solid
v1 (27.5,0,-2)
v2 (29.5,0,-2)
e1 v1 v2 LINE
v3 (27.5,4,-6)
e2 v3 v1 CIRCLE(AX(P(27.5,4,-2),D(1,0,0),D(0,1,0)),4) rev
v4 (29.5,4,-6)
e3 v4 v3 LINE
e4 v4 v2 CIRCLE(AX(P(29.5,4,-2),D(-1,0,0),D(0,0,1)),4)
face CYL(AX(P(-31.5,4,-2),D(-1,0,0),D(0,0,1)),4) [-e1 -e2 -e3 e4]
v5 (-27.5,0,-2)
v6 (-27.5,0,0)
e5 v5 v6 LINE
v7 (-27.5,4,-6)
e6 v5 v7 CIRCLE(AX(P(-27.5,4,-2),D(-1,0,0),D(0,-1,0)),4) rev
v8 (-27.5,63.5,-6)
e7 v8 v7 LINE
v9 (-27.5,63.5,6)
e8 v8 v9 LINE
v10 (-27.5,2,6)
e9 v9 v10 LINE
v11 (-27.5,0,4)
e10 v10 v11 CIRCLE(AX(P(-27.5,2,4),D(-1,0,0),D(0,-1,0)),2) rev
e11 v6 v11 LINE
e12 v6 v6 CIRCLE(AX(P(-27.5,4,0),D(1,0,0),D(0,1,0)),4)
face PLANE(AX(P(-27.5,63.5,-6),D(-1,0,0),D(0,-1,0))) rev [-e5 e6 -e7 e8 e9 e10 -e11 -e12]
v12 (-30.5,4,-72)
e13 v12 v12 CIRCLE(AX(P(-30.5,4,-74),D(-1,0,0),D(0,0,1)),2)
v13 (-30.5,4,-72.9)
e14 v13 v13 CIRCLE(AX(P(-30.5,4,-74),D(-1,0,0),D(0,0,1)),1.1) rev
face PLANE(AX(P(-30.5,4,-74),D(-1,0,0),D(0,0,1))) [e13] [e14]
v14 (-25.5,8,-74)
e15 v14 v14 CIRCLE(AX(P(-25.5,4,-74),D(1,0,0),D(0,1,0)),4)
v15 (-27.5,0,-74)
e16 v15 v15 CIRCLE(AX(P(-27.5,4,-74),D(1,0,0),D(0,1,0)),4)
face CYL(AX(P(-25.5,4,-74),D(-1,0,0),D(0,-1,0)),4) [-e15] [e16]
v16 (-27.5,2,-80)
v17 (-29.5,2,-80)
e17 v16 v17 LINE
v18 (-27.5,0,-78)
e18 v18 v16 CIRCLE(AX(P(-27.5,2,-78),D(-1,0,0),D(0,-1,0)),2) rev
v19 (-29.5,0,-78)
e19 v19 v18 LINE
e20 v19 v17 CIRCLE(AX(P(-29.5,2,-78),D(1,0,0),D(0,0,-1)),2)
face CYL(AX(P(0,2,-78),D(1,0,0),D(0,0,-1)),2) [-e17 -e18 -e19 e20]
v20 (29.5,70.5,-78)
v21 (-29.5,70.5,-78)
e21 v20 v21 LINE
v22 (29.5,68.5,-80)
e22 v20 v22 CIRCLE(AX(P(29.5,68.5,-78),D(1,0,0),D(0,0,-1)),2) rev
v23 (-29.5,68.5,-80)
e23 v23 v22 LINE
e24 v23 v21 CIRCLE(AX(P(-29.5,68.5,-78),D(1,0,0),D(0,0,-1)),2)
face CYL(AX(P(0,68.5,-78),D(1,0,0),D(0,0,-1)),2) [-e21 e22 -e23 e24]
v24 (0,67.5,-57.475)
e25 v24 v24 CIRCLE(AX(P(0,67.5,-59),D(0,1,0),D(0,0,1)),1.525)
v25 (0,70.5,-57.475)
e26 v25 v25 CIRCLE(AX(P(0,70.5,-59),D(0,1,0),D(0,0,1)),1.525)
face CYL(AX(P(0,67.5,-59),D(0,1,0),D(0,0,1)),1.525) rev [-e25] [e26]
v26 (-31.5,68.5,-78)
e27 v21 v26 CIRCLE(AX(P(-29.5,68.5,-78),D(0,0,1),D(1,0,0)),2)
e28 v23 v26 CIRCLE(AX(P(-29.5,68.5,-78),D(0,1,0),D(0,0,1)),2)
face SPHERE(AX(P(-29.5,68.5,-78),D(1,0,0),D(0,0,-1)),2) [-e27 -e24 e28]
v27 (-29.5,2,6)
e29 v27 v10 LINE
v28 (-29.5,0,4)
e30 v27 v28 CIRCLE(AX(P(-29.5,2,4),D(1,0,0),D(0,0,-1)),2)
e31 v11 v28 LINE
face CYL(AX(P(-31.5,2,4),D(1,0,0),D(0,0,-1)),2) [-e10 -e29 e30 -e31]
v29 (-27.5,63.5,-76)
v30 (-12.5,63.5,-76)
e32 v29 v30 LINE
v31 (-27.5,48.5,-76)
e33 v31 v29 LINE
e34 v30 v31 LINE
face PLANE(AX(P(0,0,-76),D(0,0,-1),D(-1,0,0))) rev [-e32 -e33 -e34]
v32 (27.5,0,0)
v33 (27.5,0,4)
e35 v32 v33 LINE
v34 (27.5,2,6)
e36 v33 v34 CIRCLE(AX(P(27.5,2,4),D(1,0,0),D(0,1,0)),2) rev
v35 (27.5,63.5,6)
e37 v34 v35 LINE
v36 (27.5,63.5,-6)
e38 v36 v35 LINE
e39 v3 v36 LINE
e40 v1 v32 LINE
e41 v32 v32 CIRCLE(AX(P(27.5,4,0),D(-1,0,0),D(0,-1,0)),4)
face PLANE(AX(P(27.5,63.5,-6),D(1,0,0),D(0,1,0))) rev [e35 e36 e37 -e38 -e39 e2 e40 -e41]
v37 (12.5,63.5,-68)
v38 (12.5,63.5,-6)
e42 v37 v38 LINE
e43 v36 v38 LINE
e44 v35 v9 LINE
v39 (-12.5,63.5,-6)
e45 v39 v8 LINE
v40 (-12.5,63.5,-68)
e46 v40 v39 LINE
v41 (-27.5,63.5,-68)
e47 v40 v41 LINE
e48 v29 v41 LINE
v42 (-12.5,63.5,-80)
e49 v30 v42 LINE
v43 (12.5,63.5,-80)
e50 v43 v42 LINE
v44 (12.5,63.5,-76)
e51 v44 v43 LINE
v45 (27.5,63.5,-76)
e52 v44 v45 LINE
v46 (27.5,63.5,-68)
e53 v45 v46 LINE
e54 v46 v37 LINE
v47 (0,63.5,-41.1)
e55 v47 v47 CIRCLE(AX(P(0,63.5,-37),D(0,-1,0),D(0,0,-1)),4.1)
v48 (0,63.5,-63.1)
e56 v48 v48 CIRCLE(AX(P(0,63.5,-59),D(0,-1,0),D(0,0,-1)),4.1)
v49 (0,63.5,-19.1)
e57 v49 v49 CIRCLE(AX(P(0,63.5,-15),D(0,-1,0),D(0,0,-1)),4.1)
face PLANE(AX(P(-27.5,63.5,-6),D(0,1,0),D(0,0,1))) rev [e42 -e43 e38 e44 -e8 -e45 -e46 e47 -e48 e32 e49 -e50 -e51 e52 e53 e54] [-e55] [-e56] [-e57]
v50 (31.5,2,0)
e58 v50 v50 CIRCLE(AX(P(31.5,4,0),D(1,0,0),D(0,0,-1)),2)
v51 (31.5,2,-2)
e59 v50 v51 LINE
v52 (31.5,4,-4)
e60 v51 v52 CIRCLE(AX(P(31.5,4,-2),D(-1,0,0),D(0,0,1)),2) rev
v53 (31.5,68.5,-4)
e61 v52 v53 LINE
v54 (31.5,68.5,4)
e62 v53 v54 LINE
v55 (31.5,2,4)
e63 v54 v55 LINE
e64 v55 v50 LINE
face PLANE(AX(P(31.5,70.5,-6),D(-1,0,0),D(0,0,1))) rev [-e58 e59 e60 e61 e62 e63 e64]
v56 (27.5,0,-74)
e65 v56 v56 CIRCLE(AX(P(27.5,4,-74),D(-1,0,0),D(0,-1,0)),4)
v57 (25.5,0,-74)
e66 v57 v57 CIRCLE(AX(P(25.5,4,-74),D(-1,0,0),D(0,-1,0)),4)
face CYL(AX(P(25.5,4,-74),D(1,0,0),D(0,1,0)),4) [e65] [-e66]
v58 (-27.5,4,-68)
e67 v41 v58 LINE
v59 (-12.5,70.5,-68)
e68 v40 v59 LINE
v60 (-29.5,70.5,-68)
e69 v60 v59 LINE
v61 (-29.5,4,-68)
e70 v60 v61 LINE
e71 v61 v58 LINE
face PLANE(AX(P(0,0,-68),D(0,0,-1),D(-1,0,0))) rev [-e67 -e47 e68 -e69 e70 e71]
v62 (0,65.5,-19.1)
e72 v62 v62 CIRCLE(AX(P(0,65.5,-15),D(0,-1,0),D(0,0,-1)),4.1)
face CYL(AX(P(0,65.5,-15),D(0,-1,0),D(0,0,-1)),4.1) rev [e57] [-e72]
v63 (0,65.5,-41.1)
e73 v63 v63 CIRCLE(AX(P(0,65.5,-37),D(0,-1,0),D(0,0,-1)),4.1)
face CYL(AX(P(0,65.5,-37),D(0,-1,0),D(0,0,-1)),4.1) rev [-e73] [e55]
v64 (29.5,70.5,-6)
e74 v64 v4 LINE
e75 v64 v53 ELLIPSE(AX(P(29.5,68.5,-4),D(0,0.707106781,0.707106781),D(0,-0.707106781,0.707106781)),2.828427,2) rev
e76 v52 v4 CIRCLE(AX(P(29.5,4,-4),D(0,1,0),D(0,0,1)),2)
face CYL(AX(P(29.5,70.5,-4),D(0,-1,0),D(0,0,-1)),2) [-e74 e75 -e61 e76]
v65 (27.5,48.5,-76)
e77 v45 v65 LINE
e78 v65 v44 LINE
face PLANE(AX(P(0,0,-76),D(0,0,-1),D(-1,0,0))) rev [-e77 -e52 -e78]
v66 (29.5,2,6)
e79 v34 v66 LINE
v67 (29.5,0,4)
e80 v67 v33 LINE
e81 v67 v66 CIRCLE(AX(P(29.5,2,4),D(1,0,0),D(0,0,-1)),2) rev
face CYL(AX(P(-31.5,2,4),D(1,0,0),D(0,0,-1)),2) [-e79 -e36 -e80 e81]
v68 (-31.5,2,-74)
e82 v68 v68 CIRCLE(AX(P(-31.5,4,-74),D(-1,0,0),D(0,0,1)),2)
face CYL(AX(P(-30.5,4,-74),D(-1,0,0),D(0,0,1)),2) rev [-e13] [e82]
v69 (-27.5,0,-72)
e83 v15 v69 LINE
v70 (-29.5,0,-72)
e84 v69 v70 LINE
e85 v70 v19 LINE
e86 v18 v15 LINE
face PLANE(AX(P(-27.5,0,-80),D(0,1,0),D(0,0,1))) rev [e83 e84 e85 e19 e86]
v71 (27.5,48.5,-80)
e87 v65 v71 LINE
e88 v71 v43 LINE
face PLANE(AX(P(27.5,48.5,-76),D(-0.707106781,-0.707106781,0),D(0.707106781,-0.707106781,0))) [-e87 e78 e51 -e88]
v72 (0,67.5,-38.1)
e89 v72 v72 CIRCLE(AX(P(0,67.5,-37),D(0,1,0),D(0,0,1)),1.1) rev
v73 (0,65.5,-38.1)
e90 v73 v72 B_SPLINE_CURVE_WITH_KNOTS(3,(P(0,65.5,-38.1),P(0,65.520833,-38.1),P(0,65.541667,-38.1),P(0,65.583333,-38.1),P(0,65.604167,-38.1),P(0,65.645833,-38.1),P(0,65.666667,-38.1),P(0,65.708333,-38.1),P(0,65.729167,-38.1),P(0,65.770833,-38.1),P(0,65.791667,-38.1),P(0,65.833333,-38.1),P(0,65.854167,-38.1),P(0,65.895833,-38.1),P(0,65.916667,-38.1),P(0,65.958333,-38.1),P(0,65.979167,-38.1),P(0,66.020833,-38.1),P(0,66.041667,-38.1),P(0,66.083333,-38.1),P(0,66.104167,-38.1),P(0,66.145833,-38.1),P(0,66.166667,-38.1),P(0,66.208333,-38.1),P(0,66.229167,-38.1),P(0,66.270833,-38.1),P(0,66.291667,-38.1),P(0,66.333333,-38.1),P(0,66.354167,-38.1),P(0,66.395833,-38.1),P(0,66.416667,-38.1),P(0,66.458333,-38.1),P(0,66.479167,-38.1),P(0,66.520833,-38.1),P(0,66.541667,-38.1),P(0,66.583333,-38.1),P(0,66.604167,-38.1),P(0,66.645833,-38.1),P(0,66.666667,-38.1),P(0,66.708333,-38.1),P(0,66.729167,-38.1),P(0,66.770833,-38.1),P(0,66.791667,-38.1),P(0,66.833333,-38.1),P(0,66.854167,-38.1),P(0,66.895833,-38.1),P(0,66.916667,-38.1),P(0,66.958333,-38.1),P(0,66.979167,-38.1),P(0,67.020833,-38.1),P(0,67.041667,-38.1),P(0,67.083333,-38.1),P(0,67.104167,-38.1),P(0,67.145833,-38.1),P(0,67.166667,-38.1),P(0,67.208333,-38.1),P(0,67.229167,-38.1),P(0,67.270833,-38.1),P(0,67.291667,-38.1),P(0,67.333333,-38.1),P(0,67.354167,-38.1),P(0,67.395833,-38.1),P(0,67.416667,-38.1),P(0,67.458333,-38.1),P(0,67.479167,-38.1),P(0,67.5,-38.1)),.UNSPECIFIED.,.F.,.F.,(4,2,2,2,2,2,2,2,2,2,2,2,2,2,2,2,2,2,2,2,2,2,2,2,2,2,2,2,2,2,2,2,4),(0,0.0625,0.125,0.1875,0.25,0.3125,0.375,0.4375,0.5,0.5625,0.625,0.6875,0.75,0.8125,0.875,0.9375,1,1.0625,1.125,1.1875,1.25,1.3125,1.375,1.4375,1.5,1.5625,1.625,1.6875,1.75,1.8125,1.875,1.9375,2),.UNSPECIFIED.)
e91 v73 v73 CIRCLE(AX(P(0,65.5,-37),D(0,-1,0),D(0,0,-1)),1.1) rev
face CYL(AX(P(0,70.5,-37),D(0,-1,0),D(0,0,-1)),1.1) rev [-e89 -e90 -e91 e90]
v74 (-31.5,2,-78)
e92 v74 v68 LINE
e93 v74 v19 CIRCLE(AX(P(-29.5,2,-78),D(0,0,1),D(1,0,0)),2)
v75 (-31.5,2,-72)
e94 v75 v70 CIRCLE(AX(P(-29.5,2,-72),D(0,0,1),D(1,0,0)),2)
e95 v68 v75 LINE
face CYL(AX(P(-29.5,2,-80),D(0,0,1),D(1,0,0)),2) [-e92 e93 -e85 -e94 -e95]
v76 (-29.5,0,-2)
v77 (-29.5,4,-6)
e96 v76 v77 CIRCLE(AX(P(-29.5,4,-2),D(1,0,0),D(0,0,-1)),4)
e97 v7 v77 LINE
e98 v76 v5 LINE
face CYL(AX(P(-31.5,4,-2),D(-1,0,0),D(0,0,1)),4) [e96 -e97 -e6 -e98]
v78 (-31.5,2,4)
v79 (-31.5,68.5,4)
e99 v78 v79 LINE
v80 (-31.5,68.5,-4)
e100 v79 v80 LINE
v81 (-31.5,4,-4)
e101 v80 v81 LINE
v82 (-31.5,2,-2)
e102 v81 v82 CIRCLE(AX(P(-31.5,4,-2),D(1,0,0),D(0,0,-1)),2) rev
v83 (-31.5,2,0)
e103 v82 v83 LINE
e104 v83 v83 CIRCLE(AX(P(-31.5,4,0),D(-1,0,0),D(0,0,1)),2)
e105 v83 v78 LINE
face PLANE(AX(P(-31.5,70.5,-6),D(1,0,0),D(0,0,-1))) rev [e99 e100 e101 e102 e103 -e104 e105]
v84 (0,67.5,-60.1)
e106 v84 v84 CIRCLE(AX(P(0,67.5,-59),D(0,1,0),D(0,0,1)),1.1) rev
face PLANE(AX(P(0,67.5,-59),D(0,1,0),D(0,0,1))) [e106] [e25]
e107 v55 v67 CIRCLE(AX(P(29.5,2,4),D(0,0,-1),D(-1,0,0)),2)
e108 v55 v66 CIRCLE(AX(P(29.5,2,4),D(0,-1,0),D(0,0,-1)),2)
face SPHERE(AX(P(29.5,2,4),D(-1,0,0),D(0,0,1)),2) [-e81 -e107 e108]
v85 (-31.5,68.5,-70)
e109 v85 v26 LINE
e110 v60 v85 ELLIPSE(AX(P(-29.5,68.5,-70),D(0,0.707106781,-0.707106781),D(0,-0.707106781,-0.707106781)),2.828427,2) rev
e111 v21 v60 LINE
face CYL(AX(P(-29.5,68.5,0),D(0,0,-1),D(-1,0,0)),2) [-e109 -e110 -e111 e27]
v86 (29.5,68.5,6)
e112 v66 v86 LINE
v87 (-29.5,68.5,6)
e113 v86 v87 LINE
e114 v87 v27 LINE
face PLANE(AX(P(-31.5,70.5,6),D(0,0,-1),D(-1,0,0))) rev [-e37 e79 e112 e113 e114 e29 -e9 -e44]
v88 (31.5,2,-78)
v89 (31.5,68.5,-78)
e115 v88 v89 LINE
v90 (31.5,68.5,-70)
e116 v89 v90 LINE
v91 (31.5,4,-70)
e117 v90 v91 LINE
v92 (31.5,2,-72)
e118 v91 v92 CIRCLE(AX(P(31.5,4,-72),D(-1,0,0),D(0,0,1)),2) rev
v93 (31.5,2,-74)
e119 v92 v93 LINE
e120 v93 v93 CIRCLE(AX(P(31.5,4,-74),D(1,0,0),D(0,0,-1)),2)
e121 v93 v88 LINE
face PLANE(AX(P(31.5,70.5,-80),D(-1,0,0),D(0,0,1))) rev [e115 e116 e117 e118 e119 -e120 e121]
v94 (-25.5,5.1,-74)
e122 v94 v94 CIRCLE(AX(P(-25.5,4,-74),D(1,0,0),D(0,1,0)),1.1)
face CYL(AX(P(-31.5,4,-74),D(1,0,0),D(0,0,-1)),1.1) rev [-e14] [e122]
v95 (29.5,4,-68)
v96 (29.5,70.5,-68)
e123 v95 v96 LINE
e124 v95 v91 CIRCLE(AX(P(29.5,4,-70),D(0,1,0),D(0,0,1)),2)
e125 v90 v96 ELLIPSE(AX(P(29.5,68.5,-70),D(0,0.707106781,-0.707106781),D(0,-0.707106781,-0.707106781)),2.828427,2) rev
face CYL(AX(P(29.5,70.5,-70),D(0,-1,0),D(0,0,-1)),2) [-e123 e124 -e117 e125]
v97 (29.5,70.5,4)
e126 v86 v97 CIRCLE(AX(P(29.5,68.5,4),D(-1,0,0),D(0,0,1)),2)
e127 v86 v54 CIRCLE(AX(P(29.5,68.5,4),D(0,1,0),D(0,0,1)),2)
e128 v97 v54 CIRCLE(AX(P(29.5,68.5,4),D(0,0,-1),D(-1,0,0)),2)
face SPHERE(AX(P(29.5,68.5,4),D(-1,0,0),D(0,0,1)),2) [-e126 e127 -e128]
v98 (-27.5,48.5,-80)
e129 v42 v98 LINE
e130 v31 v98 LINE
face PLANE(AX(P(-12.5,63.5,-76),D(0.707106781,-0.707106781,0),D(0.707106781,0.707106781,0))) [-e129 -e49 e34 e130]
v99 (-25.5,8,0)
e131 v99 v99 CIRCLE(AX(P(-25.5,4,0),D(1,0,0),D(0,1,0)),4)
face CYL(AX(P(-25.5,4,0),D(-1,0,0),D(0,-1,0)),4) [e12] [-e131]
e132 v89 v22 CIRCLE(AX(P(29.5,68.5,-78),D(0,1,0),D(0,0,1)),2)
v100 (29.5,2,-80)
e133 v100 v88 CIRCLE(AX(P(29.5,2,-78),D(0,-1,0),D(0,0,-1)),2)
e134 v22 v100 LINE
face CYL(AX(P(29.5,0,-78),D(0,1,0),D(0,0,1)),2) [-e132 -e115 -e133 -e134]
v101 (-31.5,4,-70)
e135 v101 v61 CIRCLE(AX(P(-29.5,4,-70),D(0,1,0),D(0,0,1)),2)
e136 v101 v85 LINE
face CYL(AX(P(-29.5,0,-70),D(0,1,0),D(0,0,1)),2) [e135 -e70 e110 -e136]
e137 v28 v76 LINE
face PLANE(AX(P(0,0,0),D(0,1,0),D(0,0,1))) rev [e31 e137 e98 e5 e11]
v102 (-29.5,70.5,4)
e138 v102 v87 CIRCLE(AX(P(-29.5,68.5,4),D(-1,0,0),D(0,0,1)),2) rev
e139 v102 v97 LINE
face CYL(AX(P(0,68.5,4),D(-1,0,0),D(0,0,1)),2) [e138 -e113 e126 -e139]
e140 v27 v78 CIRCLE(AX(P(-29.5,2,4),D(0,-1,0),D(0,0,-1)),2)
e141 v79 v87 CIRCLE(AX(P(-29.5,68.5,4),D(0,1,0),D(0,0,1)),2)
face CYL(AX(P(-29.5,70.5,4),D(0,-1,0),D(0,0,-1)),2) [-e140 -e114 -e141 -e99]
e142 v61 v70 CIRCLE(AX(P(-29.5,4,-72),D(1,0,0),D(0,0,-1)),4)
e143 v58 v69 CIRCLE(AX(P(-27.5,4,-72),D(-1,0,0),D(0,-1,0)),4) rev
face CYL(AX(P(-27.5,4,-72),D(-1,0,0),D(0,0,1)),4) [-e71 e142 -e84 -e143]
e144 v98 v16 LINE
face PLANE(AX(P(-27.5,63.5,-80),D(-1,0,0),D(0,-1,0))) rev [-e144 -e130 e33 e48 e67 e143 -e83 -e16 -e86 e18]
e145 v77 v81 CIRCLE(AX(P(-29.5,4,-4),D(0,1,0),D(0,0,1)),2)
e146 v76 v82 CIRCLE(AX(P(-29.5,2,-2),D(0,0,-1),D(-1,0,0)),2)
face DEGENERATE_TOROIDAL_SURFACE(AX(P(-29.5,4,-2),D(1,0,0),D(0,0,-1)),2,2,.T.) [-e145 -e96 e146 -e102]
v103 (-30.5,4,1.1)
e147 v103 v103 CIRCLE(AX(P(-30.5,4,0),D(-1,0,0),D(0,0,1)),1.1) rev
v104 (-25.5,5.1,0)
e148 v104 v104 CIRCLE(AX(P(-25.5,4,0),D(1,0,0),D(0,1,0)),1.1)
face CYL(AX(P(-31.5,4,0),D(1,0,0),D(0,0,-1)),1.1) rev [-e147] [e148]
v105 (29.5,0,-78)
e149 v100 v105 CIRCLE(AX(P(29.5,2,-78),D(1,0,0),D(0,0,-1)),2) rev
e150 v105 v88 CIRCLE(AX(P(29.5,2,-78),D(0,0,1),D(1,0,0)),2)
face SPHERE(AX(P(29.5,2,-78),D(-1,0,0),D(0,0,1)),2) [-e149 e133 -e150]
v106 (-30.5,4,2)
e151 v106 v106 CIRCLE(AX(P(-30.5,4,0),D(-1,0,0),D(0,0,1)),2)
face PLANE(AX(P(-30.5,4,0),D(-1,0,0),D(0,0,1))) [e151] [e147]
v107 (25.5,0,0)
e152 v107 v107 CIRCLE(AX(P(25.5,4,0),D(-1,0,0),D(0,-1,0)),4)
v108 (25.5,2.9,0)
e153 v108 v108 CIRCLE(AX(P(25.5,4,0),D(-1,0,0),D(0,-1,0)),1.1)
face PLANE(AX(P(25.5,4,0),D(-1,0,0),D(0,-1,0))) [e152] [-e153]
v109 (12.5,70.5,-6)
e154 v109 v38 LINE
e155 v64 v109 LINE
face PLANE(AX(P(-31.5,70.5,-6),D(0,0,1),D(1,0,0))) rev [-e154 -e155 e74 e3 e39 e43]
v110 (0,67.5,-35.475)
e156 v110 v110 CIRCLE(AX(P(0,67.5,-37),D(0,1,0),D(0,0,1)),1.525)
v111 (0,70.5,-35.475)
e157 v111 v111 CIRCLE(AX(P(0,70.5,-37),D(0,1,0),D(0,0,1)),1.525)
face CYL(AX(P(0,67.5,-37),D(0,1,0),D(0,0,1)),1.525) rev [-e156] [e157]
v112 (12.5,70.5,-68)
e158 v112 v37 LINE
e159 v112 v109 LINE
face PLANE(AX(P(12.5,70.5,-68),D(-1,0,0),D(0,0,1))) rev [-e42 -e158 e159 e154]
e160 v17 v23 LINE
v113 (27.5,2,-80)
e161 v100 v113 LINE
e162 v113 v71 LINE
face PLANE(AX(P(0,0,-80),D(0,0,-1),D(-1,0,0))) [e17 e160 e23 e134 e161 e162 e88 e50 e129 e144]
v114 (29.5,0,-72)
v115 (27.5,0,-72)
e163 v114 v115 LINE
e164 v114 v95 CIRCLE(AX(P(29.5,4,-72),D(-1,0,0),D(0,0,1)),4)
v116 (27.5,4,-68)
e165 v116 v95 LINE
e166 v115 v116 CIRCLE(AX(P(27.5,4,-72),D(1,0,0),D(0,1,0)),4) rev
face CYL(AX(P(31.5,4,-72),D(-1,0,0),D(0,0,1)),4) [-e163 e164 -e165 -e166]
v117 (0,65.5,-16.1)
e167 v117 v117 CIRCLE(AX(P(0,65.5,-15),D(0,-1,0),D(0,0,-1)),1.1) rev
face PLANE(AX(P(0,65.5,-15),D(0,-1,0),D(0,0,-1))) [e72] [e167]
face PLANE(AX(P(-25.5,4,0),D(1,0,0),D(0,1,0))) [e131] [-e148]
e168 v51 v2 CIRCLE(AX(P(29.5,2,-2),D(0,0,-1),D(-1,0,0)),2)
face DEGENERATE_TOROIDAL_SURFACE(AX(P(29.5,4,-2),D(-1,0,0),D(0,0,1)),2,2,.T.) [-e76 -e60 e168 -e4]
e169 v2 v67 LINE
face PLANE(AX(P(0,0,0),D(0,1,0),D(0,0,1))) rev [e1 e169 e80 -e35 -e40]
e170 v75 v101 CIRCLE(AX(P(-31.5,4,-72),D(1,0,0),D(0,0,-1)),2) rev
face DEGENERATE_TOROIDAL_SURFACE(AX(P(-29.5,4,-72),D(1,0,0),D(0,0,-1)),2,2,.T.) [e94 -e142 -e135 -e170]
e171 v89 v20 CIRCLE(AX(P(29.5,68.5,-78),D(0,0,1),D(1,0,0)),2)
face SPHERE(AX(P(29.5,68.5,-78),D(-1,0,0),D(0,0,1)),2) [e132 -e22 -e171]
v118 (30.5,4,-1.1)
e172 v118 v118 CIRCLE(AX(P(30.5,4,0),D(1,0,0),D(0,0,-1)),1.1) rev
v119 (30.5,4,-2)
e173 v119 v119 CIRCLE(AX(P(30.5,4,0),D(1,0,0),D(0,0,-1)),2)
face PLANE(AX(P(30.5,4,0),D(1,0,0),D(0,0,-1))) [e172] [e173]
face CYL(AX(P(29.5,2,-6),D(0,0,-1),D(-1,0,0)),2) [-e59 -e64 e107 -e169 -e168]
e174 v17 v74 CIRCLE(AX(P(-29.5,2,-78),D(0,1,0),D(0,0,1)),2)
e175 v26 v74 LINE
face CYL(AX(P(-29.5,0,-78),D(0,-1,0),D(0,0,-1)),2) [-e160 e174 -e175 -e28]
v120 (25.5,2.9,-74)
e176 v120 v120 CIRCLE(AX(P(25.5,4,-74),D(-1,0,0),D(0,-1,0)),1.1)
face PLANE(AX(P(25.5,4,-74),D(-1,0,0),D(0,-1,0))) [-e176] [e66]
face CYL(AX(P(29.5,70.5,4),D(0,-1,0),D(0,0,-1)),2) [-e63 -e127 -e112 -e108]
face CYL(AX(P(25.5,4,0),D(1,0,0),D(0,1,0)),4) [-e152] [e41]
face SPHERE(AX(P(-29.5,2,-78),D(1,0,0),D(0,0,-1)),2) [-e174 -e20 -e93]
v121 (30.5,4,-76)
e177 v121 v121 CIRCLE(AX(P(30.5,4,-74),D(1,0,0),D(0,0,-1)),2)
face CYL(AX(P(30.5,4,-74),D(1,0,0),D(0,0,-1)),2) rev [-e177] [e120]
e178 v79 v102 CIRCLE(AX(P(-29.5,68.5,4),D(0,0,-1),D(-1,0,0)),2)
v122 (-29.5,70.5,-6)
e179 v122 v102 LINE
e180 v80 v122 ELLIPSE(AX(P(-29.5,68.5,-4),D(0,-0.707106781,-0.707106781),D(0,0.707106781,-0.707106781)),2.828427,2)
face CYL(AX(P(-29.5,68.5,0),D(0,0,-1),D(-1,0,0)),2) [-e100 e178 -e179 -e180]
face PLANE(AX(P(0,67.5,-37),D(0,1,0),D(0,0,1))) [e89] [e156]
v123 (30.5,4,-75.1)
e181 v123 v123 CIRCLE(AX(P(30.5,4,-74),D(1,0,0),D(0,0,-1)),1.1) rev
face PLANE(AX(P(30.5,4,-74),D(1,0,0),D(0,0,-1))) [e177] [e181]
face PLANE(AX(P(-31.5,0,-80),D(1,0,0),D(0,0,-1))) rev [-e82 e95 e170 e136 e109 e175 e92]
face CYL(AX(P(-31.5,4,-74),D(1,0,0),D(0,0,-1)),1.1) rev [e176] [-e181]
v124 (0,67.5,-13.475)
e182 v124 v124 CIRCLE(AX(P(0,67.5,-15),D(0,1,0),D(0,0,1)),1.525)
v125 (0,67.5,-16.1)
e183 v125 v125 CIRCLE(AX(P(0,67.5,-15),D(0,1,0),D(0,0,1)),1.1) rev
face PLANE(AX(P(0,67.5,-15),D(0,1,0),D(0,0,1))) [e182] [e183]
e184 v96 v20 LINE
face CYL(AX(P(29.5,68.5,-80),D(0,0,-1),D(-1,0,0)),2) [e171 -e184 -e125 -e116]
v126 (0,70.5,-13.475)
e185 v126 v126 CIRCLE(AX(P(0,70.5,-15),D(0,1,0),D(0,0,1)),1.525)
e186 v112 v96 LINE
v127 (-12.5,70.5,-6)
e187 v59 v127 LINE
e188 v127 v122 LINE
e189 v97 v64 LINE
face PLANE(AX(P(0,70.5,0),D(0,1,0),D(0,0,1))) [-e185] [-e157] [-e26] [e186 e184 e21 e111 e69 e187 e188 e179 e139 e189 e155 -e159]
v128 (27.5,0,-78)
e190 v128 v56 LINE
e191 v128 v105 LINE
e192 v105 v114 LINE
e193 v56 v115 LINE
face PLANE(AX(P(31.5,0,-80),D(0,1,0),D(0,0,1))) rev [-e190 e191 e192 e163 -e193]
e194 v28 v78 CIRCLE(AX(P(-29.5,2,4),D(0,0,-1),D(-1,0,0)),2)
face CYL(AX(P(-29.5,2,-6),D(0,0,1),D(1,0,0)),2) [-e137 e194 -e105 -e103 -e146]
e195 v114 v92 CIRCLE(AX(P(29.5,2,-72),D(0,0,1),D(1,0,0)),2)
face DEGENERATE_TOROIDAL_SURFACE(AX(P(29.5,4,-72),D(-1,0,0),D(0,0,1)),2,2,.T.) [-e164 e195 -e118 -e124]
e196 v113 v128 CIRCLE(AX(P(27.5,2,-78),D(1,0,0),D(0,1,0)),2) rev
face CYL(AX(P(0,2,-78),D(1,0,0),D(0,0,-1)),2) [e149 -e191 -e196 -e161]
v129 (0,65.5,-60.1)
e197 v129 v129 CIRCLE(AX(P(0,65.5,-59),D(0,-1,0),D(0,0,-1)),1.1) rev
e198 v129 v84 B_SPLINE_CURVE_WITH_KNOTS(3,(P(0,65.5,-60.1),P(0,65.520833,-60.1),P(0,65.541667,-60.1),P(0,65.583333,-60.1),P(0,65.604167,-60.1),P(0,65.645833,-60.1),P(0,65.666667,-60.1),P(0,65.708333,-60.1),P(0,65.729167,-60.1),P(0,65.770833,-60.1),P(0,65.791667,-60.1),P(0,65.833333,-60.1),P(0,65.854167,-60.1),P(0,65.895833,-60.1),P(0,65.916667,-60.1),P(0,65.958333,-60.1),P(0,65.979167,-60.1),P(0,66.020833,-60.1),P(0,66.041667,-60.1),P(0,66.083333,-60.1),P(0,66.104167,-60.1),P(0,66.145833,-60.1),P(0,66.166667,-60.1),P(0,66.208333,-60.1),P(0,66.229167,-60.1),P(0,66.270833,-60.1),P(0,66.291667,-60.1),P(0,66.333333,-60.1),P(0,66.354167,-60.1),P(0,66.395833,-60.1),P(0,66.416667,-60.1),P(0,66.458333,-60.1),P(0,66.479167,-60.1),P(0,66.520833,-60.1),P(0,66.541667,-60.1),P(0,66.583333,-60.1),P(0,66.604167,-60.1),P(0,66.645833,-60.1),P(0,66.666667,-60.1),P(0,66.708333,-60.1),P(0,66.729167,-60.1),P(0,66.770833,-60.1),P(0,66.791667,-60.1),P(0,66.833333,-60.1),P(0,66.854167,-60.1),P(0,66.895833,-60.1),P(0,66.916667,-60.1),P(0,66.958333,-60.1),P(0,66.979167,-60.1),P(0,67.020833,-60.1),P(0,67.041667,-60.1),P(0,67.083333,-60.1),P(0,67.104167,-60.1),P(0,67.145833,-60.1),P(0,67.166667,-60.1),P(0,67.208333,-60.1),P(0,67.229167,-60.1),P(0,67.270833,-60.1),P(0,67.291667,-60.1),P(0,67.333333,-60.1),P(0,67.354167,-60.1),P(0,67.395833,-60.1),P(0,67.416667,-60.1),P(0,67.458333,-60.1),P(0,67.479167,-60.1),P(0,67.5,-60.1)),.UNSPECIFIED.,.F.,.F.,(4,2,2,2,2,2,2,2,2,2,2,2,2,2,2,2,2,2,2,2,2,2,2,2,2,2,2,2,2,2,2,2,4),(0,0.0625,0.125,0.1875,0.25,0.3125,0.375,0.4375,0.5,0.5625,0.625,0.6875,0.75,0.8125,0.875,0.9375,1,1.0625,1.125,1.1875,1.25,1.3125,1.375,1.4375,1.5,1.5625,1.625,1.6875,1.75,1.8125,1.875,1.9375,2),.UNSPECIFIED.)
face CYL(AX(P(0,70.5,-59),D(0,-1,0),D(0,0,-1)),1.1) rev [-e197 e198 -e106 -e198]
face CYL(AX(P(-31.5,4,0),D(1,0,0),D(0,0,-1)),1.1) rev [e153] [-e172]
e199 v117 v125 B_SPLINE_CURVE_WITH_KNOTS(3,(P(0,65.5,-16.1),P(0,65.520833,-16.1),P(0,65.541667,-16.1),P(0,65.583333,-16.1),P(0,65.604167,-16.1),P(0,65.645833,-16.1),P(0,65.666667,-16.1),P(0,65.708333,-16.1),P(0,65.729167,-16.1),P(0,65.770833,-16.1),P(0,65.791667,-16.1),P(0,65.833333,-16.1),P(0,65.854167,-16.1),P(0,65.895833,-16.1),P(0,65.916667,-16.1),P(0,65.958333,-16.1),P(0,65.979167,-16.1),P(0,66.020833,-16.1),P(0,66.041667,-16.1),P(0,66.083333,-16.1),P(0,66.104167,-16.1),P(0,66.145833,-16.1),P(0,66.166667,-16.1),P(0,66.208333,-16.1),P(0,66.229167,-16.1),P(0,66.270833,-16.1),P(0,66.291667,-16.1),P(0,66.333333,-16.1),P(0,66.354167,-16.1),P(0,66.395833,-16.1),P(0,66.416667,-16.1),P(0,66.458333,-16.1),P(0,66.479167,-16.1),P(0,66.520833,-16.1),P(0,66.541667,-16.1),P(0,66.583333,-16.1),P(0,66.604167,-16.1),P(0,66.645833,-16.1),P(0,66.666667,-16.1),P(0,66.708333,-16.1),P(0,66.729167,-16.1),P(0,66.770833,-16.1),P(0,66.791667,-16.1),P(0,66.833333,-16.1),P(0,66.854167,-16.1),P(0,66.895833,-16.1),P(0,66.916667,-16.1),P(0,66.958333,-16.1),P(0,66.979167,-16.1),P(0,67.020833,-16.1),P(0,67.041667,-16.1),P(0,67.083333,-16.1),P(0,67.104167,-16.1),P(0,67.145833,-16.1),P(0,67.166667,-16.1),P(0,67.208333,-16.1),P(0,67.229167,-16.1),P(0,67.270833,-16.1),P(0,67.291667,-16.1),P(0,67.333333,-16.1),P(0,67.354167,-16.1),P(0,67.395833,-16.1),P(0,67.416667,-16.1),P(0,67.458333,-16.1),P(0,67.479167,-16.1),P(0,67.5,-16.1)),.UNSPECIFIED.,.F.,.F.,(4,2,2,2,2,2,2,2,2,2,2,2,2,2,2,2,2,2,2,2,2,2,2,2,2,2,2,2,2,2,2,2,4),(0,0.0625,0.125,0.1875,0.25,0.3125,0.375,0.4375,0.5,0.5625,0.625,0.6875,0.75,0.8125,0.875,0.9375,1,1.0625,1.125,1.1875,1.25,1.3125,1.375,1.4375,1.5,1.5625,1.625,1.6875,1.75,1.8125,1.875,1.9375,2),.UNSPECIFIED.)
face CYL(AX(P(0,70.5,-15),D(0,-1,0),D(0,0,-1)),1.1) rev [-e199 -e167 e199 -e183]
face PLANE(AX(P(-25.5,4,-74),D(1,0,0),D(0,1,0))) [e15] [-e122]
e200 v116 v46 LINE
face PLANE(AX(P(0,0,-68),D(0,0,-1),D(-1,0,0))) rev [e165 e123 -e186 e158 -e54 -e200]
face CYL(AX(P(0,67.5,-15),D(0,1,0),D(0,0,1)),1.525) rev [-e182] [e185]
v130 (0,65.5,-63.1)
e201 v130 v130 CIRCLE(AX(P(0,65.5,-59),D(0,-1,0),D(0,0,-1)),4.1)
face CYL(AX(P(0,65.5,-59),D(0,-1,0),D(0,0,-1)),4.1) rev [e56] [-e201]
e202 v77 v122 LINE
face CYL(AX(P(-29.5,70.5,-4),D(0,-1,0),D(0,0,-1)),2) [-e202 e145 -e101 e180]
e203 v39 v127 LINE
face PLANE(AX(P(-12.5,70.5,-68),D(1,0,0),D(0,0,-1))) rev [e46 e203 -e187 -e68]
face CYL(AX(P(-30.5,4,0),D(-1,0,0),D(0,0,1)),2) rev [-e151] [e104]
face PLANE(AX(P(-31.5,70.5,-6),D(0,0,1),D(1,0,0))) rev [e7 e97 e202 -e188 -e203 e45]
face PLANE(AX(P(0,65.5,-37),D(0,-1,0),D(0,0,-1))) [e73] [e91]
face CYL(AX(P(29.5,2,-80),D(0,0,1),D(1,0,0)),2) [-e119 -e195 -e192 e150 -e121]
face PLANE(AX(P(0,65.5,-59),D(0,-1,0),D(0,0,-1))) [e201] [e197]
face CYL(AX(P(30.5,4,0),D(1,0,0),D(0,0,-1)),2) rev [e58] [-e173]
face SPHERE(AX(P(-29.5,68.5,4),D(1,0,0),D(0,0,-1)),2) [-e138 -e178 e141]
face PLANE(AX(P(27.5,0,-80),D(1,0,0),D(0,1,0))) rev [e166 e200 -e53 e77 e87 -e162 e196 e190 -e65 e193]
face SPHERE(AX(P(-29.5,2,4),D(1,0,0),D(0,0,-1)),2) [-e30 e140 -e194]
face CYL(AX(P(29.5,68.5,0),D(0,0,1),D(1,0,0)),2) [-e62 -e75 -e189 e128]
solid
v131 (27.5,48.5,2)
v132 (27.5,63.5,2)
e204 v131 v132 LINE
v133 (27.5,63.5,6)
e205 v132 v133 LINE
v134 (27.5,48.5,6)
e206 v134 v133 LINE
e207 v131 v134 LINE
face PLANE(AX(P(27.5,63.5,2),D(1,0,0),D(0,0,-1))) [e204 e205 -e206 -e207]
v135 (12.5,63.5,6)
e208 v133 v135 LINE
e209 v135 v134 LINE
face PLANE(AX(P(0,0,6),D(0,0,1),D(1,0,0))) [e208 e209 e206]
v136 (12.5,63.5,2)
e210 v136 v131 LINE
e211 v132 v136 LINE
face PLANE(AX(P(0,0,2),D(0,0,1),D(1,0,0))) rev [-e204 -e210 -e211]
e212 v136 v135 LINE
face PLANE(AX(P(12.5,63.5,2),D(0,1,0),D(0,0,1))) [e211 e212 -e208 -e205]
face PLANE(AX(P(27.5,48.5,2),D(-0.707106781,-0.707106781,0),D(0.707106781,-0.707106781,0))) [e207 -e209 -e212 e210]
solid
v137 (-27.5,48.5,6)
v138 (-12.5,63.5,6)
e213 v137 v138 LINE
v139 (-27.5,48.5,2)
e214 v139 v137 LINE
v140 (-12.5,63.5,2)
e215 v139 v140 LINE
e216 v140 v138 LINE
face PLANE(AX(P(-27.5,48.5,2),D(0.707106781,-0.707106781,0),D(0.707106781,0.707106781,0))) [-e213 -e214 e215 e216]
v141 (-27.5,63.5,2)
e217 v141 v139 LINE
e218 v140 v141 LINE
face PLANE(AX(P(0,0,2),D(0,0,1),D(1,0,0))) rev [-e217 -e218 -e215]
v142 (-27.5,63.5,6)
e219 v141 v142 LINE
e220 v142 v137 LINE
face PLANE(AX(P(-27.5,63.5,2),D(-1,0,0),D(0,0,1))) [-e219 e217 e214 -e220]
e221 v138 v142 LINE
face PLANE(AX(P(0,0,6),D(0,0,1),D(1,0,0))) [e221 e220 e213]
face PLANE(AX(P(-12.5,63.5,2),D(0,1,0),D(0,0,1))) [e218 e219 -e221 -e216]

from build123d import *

# Parameters (mm, degrees)
SKETCH_1_W          = 63
SKETCH_1_H          = 12
EXTRUDE_1_DEPTH     = 70.5
SKETCH_2_W          = 55
SKETCH_2_H          = 63.5
CUT_EXTRUDE_1_DEPTH = 79.144097666
SKETCH_4_W          = 25
SKETCH_4_H          = 7
EXTRUDE_2_DEPTH     = 62
EXTRUDE_3_DEPTH     = 12
SKETCH_3_R          = 1.1
CUT_EXTRUDE_2_DEPTH = 124.851725866
EXTRUDE_START       = 2
SKETCH_7_R          = 4
SKETCH_7_R_2        = 1.1
EXTRUDE_4_DEPTH     = 2
SKETCH_8_R          = 4
SKETCH_8_R_2        = 1.1
EXTRUDE_5_DEPTH     = 2
EXTRUDE_6_DEPTH     = 4
EXTRUDE_6_2_DEPTH   = 4
EXTRUDE_7_DEPTH     = 4
SKETCH_9_R          = 1.1
CUT_EXTRUDE_3_DEPTH = 107.885452705
SKETCH_10_R         = 4.1
CUT_EXTRUDE_4_DEPTH = 2
SKETCH_11_R         = 2
CUT_EXTRUDE_5_DEPTH = 1
CUT_EXTRUDE_START   = -1
SKETCH_12_R         = 2
CUT_EXTRUDE_6_DEPTH = 1
SKETCH_15_R         = 1.525
CUT_EXTRUDE_7_DEPTH = 3
FILLET_1_R          = 4
FILLET_2_R          = 2
FILLET_3_R          = 2
FILLET_4_R          = 2


with BuildPart() as part:
    # 草图1 → 凸台-拉伸1 (new body)
    with BuildSketch(Plane(origin=(0, 0, 0), x_dir=(1, 0, 0), z_dir=(0, 1, 0))):
        Rectangle(SKETCH_1_W, SKETCH_1_H)
    extrude(amount=EXTRUDE_1_DEPTH)

    # 草图2 → 切除-拉伸1 (cut, through all)
    with BuildSketch(Plane.XY.offset(6)):
        with Locations((0, 31.75)):
            Rectangle(SKETCH_2_W, SKETCH_2_H)
    extrude(amount=-CUT_EXTRUDE_1_DEPTH, mode=Mode.SUBTRACT)

    # 草图4 → 凸台-拉伸2 (add)
    with BuildSketch(Plane(origin=(0, 0, -6), x_dir=(-1, 0, 0), z_dir=(0, 0, -1))):
        with Locations((0, 67)):
            Rectangle(SKETCH_4_W, SKETCH_4_H)
    extrude(amount=EXTRUDE_2_DEPTH)

    # 草图5 → 凸台-拉伸3 (add)
    with BuildSketch(Plane(origin=(0, 0, -68), x_dir=(-1, 0, 0), z_dir=(0, 0, -1))):
        Polygon((12.5, 63.5), (27.5, 63.5), (27.5, 0), (31.5, 0), (31.5, 70.5), (12.5, 70.5), (-12.5, 70.5), (-31.5, 70.5), (-31.5, 0), (-27.5, 0), (-27.5, 63.5), (-12.5, 63.5), align=None)
    extrude(amount=EXTRUDE_3_DEPTH)

    # 草图3 → 切除-拉伸2 (cut, through all)
    with BuildSketch(Plane(origin=(31.5, 0, 0), x_dir=(0, 0, -1), z_dir=(1, 0, 0))):
        with Locations((0, 4)):
            Circle(SKETCH_3_R)
        with Locations((74, 4)):
            Circle(SKETCH_3_R)
    extrude(amount=-CUT_EXTRUDE_2_DEPTH, mode=Mode.SUBTRACT)

    # 草图7 → 凸台-拉伸4 (add)
    # profile 1 of 2: a face of its own
    with BuildSketch(Plane(origin=(-27.5, 0, 0), x_dir=(0, 0, -1), z_dir=(1, 0, 0)).offset(EXTRUDE_START)):
        with Locations(Location((0, 4, 0), (0, 0, 270))):
            Circle(SKETCH_7_R)
        with Locations((0, 4)):
            Circle(SKETCH_7_R_2, mode=Mode.SUBTRACT)
    # profile 2 of 2: a face of its own
    with BuildSketch(Plane(origin=(-27.5, 0, 0), x_dir=(0, 0, -1), z_dir=(1, 0, 0)).offset(EXTRUDE_START)):
        with Locations(Location((74, 4, 0), (0, 0, 270))):
            Circle(SKETCH_7_R)
        with Locations((74, 4)):
            Circle(SKETCH_7_R_2, mode=Mode.SUBTRACT)
    extrude(amount=-EXTRUDE_4_DEPTH)

    # 草图8 → 凸台-拉伸5 (add)
    # profile 1 of 2: a face of its own
    with BuildSketch(Plane.ZY.offset(-27.5)):
        with Locations(Location((-74, 4, 0), (0, 0, 270))):
            Circle(SKETCH_8_R)
        with Locations(Location((-74, 4, 0), (0, 0, 180))):
            Circle(SKETCH_8_R_2, mode=Mode.SUBTRACT)
    # profile 2 of 2: a face of its own
    with BuildSketch(Plane.ZY.offset(-27.5)):
        with Locations(Location((0, 4, 0), (0, 0, 270))):
            Circle(SKETCH_8_R)
        with Locations(Location((0, 4, 0), (0, 0, 180))):
            Circle(SKETCH_8_R_2, mode=Mode.SUBTRACT)
    extrude(amount=EXTRUDE_5_DEPTH)

    # 草图14 → 凸台-拉伸7 (add)
    with BuildSketch(Plane(origin=(0, 0, -80), x_dir=(-1, 0, 0), z_dir=(0, 0, -1))):
        Polygon((27.5, 63.5), (12.5, 63.5), (27.5, 48.5), align=None)
        Polygon((-27.5, 63.5), (-27.5, 48.5), (-12.5, 63.5), align=None)
    extrude(amount=-EXTRUDE_7_DEPTH)

    # 草图9 → 切除-拉伸3 (cut, through all)
    with BuildSketch(Plane.XZ.offset(-63.5)):
        with Locations(Location((0, -15, 0), (0, 0, 270))):
            Circle(SKETCH_9_R)
        with Locations(Location((0, -59, 0), (0, 0, 270))):
            Circle(SKETCH_9_R)
        with Locations(Location((0, -37, 0), (0, 0, 270))):
            Circle(SKETCH_9_R)
    extrude(amount=-CUT_EXTRUDE_3_DEPTH, mode=Mode.SUBTRACT)

    # 草图10 → 切除-拉伸4 (cut)
    with BuildSketch(Plane.XZ.offset(-63.5)):
        with Locations(Location((0, -15, 0), (0, 0, 270))):
            Circle(SKETCH_10_R)
        with Locations(Location((0, -59, 0), (0, 0, 270))):
            Circle(SKETCH_10_R)
        with Locations(Location((0, -37, 0), (0, 0, 270))):
            Circle(SKETCH_10_R)
    extrude(amount=-CUT_EXTRUDE_4_DEPTH, mode=Mode.SUBTRACT)

    # 草图11 → 切除-拉伸5 (cut)
    with BuildSketch(Plane(origin=(31.5, 0, 0), x_dir=(0, 0, -1), z_dir=(1, 0, 0))):
        with Locations((0, 4)):
            Circle(SKETCH_11_R)
        with Locations((74, 4)):
            Circle(SKETCH_11_R)
    extrude(amount=-CUT_EXTRUDE_5_DEPTH, mode=Mode.SUBTRACT)

    # 草图12 → 切除-拉伸6 (cut)
    with BuildSketch(Plane.ZY.offset(31.5).offset(CUT_EXTRUDE_START)):
        with Locations(Location((-74, 4, 0), (0, 0, 180))):
            Circle(SKETCH_12_R)
        with Locations(Location((0, 4, 0), (0, 0, 180))):
            Circle(SKETCH_12_R)
    extrude(amount=CUT_EXTRUDE_6_DEPTH, mode=Mode.SUBTRACT)

    # 草图15 → 切除-拉伸7 (cut)
    with BuildSketch(Plane(origin=(0, 70.5, 0), x_dir=(1, 0, 0), z_dir=(0, 1, 0))):
        with Locations(Location((0, 59, 0), (0, 0, 270))):
            Circle(SKETCH_15_R)
        with Locations(Location((0, 37, 0), (0, 0, 270))):
            Circle(SKETCH_15_R)
        with Locations(Location((0, 15, 0), (0, 0, 270))):
            Circle(SKETCH_15_R)
    extrude(amount=-CUT_EXTRUDE_7_DEPTH, mode=Mode.SUBTRACT)

    # 圆角1
    fillet_1_edges = [part.edges().sort_by_distance(p)[0] for p in [
        (-29.5, 0, -6),
        (29.5, 0, -68),
        (-29.5, 0, -68),
        (29.5, 0, -6),
    ]]
    fillet(fillet_1_edges, radius=FILLET_1_R)

    # 圆角2
    fillet_2_edges = [part.edges().sort_by_distance(p)[0] for p in [
        (29.5, 0, 6),
        (-29.5, 0, 6),
        (29.5, 0, -80),
        (-29.5, 0, -80),
    ]]
    fillet(fillet_2_edges, radius=FILLET_2_R)

    # 圆角3
    fillet_3_edges = [part.edges().sort_by_distance(p)[0] for p in [
        (0, 70.5, 6),
        (0, 70.5, -80),
    ]]
    fillet(fillet_3_edges, radius=FILLET_3_R)

    # 圆角4
    fillet_4_edges = [part.edges().sort_by_distance(p)[0] for p in [
        (-31.5, 70.5, -1),
        (31.5, 1.171572875, -69.171572875),
        (31.5, 1.171572875, -4.828427125),
        (-31.5, 0, 1),
        (-31.5, 1.171572875, -4.828427125),
        (-31.5, 37.25, -68),
        (-31.5, 1.171572875, -69.171572875),
        (-31.5, 35.25, -80),
        (31.5, 0, -75),
        (31.5, 0.585786438, -79.414213562),
        (-31.5, 0, -75),
        (-31.5, 0.585786438, -79.414213562),
        (-31.5, 0.585786438, 5.414213562),
        (31.5, 0, 1),
        (31.5, 0.585786438, 5.414213562),
        (31.5, 70.5, -1),
        (31.5, 70.5, -73),
        (-31.5, 70.5, -73),
        (31.5, 35.25, 6),
        (31.5, 69.914213562, 5.414213562),
        (-31.5, 35.25, 6),
        (-31.5, 69.914213562, 5.414213562),
        (31.5, 35.25, -80),
        (31.5, 69.914213562, -79.414213562),
        (-31.5, 69.914213562, -79.414213562),
        (31.5, 37.25, -68),
        (-31.5, 37.25, -6),
        (31.5, 37.25, -6),
    ]]
    fillet(fillet_4_edges, radius=FILLET_4_R - 0.0001)  # a hair under: the kernel refuses the full size


with BuildPart() as body_2:
    # 草图13 → 凸台-拉伸6 (new body)
    with BuildSketch(Plane.XY.offset(6)):
        Polygon((-27.5, 63.5), (-27.5, 48.5), (-12.5, 63.5), align=None)
    extrude(amount=-EXTRUDE_6_DEPTH)


with BuildPart() as body_3:
    # 草图13 → Extrude 6 2 (new body)
    with BuildSketch(Plane.XY.offset(6)):
        Polygon((27.5, 48.5), (12.5, 63.5), (27.5, 63.5), align=None)
    extrude(amount=-EXTRUDE_6_2_DEPTH)


solid = Compound([part.part, body_2.part, body_3.part])
